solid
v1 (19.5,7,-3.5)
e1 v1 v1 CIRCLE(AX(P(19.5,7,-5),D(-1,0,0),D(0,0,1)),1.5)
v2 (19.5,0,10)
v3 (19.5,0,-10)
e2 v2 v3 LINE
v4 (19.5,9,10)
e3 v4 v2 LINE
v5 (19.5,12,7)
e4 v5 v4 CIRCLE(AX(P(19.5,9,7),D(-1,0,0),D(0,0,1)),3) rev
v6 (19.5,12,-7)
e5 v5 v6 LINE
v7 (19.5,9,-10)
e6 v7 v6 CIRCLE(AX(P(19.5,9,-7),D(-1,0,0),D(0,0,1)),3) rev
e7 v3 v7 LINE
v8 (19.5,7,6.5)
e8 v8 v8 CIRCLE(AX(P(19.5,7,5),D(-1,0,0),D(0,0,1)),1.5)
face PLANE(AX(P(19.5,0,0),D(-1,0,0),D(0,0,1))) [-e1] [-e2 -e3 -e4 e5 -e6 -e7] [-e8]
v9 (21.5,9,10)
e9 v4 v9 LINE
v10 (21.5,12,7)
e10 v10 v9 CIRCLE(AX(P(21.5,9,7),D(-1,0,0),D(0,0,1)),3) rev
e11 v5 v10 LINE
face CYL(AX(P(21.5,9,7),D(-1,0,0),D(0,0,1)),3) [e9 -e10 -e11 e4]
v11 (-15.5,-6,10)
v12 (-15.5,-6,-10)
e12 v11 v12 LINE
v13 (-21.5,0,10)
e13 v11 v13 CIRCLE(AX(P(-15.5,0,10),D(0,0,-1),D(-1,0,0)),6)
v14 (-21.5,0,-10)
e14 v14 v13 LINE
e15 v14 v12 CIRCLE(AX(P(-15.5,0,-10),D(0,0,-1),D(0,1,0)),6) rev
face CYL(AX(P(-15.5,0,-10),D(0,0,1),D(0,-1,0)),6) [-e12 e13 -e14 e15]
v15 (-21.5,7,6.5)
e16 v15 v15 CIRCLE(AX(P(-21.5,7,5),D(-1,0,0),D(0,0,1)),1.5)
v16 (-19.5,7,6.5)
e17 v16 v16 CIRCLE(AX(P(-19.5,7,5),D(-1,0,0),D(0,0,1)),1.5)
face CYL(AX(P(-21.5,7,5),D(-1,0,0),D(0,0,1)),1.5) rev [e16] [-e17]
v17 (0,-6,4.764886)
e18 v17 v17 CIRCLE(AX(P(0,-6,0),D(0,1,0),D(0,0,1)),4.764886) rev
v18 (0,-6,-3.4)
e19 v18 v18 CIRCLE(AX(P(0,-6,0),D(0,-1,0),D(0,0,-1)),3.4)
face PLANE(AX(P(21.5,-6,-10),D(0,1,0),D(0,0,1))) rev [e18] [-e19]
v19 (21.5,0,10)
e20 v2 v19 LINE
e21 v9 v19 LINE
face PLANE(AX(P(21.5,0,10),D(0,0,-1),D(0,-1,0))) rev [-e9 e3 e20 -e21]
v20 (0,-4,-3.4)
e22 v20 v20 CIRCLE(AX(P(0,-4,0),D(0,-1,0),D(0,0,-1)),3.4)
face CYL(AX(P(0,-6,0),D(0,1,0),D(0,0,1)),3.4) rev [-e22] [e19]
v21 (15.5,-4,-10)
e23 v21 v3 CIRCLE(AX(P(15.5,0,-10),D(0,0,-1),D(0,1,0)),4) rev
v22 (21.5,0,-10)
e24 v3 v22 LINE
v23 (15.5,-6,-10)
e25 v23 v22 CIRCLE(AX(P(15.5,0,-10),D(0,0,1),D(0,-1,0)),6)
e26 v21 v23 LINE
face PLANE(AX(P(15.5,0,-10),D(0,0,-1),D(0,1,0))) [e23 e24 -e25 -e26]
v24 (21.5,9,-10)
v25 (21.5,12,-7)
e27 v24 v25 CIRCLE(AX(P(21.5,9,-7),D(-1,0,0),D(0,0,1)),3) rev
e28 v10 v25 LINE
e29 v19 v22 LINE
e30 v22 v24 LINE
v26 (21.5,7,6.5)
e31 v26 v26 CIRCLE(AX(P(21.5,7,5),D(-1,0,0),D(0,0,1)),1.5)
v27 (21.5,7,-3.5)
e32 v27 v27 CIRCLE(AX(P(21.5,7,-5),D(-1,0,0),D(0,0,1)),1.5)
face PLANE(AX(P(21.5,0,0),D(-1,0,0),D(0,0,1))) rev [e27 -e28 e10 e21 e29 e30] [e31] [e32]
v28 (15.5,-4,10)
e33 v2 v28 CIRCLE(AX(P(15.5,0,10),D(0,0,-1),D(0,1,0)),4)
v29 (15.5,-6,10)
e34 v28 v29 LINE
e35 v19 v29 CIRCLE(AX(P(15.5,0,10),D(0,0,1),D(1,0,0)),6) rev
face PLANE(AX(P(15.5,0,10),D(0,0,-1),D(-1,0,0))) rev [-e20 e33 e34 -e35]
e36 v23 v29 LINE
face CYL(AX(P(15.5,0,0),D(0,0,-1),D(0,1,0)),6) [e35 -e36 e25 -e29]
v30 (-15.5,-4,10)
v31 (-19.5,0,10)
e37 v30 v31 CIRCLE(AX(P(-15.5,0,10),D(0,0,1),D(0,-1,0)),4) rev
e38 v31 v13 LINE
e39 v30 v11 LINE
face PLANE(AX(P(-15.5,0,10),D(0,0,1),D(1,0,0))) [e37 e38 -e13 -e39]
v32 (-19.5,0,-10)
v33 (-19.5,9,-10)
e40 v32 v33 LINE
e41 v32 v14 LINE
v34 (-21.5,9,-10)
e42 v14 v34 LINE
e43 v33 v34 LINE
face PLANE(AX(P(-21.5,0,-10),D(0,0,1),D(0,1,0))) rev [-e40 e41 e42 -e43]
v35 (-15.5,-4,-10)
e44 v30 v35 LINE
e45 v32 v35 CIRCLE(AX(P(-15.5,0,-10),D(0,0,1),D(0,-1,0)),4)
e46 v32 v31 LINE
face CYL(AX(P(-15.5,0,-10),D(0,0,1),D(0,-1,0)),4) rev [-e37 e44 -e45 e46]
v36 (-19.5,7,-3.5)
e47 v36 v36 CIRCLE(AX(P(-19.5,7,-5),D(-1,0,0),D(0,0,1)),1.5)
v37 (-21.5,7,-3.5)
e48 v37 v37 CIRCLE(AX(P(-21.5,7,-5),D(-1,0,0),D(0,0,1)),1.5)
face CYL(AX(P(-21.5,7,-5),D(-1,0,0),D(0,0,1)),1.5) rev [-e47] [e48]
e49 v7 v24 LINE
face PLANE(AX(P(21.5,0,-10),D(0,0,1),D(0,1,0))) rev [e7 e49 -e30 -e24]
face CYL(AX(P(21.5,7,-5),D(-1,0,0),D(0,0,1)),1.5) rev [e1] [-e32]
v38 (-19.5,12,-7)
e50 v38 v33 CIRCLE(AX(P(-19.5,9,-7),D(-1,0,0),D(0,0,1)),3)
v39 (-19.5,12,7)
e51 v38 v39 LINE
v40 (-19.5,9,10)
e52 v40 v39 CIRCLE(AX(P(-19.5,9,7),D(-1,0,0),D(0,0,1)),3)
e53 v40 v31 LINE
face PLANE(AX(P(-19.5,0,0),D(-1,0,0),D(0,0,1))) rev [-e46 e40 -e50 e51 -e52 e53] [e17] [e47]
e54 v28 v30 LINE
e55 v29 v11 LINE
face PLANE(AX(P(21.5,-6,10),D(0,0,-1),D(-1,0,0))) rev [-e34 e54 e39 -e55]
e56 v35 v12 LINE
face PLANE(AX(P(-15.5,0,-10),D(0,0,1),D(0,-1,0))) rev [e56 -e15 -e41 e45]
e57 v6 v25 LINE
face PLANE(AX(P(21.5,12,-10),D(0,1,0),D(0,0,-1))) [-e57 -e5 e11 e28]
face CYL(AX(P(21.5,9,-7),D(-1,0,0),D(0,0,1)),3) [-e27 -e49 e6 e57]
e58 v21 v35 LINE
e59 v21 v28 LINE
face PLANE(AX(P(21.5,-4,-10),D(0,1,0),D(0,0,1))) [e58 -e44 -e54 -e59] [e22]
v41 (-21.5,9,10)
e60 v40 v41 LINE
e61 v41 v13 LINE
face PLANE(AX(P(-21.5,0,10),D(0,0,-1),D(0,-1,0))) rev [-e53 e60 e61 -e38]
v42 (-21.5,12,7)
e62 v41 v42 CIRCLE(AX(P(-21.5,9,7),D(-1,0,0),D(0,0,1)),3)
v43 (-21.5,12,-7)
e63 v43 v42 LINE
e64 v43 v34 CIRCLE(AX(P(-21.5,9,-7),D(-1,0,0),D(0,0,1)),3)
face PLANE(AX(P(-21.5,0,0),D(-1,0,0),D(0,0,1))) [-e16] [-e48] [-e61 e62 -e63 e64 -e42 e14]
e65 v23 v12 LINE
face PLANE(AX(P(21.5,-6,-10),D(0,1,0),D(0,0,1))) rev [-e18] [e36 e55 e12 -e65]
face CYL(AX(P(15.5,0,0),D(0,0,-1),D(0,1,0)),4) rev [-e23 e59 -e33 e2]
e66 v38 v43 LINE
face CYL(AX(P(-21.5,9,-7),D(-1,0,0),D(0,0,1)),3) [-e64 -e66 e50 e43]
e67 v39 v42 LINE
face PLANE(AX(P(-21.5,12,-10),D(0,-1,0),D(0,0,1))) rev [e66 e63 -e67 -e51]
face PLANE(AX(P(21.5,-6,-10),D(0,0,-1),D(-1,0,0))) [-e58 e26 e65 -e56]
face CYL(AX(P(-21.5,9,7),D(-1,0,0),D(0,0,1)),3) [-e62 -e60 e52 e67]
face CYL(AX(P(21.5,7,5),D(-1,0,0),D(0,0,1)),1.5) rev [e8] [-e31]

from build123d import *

# Parameters (mm, degrees)
SKETCH1_W            = 20
SKETCH1_H            = 6
BOSS_EXTRUDE1_DEPTH  = 21.5
SKETCH2_W            = 6
SKETCH2_H            = 20
BOSS_EXTRUDE2_DEPTH  = 12
SKETCH7_R            = 1.5
CUT_EXTRUDE1_DEPTH   = 46.749316935
SKETCH8_R            = 3.4
CUT_EXTRUDE2_DEPTH   = 30.769951293
FILLET2_R            = 3
CONVERT_SOLID2_START = -10
CONVERT_SOLID2_DEPTH = 20


# Read off the part's stored shape, not the designer's step: Convert-Solid2
with BuildPart() as part:
    # Sketch1 → Boss-Extrude1 (new, symmetric)
    with BuildSketch(Plane(origin=(0, 0, 0), x_dir=(0, 0, -1), z_dir=(1, 0, 0))):
        with Locations((0, -3)):
            Rectangle(SKETCH1_W, SKETCH1_H)
    extrude(amount=BOSS_EXTRUDE1_DEPTH, both=True)

    # Sketch2 → Boss-Extrude2 (add)
    with BuildSketch(Plane(origin=(0, 0, 0), x_dir=(1, 0, 0), z_dir=(0, 1, 0))):
        with Locations((18.5, 0)):
            Rectangle(SKETCH2_W, SKETCH2_H)
        with Locations((-18.5, 0)):
            Rectangle(SKETCH2_W, SKETCH2_H)
    extrude(amount=BOSS_EXTRUDE2_DEPTH)

    # Sketch7 → Cut-Extrude1 (cut, through all)
    with BuildSketch(Plane.ZY.offset(21.5)):
        with Locations((-5, 7)):
            Circle(SKETCH7_R)
        with Locations((5, 7)):
            Circle(SKETCH7_R)
    extrude(amount=-CUT_EXTRUDE1_DEPTH, mode=Mode.SUBTRACT)

    # Sketch8 → Cut-Extrude2 (cut, through all)
    with BuildSketch(Plane.XZ.offset(6)):
        with Locations(Location((0, 0, 0), (0, 0, 270))):
            Circle(SKETCH8_R)
    extrude(amount=-CUT_EXTRUDE2_DEPTH, mode=Mode.SUBTRACT)

    # Fillet2
    fillet2_edges = [part.edges().sort_by_distance(p)[0] for p in [
        (-18.5, 12, 10),
        (-18.5, 12, -10),
        (18.5, 12, -10),
        (18.5, 12, 10),
    ]]
    fillet(fillet2_edges, radius=FILLET2_R)

    # Convert-Solid2 outline → Convert-Solid2 (cut)
    with BuildSketch(Plane.XY.offset(CONVERT_SOLID2_START)):
        with BuildLine():
            Line((21.5, -6), (21.5, 0))
            ThreePointArc((21.5, 0), (19.742640687, -4.242640687), (15.5, -6))
            Line((15.5, -6), (21.5, -6))
        make_face()
        with BuildLine():
            Line((-21.5, -6), (-15.5, -6))
            ThreePointArc((-15.5, -6), (-19.742640687, -4.242640687), (-21.5, 0))
            Line((-21.5, 0), (-21.5, -6))
        make_face()
        with BuildLine():
            Line((19.5, 0), (19.5, 12))
            Line((19.5, 12), (15.5, 12))
            Line((15.5, 12), (15.5, 0))
            Line((15.5, 0), (-15.5, 0))
            Line((-15.5, 0), (-15.5, 12))
            Line((-15.5, 12), (-19.5, 12))
            Line((-19.5, 12), (-19.5, 0))
            ThreePointArc((-19.5, 0), (-18.328427125, -2.828427125), (-15.5, -4))
            Line((-15.5, -4), (15.5, -4))
            ThreePointArc((15.5, -4), (18.328427125, -2.828427125), (19.5, 0))
        make_face()
    extrude(amount=CONVERT_SOLID2_DEPTH, mode=Mode.SUBTRACT)


solid = part.part
